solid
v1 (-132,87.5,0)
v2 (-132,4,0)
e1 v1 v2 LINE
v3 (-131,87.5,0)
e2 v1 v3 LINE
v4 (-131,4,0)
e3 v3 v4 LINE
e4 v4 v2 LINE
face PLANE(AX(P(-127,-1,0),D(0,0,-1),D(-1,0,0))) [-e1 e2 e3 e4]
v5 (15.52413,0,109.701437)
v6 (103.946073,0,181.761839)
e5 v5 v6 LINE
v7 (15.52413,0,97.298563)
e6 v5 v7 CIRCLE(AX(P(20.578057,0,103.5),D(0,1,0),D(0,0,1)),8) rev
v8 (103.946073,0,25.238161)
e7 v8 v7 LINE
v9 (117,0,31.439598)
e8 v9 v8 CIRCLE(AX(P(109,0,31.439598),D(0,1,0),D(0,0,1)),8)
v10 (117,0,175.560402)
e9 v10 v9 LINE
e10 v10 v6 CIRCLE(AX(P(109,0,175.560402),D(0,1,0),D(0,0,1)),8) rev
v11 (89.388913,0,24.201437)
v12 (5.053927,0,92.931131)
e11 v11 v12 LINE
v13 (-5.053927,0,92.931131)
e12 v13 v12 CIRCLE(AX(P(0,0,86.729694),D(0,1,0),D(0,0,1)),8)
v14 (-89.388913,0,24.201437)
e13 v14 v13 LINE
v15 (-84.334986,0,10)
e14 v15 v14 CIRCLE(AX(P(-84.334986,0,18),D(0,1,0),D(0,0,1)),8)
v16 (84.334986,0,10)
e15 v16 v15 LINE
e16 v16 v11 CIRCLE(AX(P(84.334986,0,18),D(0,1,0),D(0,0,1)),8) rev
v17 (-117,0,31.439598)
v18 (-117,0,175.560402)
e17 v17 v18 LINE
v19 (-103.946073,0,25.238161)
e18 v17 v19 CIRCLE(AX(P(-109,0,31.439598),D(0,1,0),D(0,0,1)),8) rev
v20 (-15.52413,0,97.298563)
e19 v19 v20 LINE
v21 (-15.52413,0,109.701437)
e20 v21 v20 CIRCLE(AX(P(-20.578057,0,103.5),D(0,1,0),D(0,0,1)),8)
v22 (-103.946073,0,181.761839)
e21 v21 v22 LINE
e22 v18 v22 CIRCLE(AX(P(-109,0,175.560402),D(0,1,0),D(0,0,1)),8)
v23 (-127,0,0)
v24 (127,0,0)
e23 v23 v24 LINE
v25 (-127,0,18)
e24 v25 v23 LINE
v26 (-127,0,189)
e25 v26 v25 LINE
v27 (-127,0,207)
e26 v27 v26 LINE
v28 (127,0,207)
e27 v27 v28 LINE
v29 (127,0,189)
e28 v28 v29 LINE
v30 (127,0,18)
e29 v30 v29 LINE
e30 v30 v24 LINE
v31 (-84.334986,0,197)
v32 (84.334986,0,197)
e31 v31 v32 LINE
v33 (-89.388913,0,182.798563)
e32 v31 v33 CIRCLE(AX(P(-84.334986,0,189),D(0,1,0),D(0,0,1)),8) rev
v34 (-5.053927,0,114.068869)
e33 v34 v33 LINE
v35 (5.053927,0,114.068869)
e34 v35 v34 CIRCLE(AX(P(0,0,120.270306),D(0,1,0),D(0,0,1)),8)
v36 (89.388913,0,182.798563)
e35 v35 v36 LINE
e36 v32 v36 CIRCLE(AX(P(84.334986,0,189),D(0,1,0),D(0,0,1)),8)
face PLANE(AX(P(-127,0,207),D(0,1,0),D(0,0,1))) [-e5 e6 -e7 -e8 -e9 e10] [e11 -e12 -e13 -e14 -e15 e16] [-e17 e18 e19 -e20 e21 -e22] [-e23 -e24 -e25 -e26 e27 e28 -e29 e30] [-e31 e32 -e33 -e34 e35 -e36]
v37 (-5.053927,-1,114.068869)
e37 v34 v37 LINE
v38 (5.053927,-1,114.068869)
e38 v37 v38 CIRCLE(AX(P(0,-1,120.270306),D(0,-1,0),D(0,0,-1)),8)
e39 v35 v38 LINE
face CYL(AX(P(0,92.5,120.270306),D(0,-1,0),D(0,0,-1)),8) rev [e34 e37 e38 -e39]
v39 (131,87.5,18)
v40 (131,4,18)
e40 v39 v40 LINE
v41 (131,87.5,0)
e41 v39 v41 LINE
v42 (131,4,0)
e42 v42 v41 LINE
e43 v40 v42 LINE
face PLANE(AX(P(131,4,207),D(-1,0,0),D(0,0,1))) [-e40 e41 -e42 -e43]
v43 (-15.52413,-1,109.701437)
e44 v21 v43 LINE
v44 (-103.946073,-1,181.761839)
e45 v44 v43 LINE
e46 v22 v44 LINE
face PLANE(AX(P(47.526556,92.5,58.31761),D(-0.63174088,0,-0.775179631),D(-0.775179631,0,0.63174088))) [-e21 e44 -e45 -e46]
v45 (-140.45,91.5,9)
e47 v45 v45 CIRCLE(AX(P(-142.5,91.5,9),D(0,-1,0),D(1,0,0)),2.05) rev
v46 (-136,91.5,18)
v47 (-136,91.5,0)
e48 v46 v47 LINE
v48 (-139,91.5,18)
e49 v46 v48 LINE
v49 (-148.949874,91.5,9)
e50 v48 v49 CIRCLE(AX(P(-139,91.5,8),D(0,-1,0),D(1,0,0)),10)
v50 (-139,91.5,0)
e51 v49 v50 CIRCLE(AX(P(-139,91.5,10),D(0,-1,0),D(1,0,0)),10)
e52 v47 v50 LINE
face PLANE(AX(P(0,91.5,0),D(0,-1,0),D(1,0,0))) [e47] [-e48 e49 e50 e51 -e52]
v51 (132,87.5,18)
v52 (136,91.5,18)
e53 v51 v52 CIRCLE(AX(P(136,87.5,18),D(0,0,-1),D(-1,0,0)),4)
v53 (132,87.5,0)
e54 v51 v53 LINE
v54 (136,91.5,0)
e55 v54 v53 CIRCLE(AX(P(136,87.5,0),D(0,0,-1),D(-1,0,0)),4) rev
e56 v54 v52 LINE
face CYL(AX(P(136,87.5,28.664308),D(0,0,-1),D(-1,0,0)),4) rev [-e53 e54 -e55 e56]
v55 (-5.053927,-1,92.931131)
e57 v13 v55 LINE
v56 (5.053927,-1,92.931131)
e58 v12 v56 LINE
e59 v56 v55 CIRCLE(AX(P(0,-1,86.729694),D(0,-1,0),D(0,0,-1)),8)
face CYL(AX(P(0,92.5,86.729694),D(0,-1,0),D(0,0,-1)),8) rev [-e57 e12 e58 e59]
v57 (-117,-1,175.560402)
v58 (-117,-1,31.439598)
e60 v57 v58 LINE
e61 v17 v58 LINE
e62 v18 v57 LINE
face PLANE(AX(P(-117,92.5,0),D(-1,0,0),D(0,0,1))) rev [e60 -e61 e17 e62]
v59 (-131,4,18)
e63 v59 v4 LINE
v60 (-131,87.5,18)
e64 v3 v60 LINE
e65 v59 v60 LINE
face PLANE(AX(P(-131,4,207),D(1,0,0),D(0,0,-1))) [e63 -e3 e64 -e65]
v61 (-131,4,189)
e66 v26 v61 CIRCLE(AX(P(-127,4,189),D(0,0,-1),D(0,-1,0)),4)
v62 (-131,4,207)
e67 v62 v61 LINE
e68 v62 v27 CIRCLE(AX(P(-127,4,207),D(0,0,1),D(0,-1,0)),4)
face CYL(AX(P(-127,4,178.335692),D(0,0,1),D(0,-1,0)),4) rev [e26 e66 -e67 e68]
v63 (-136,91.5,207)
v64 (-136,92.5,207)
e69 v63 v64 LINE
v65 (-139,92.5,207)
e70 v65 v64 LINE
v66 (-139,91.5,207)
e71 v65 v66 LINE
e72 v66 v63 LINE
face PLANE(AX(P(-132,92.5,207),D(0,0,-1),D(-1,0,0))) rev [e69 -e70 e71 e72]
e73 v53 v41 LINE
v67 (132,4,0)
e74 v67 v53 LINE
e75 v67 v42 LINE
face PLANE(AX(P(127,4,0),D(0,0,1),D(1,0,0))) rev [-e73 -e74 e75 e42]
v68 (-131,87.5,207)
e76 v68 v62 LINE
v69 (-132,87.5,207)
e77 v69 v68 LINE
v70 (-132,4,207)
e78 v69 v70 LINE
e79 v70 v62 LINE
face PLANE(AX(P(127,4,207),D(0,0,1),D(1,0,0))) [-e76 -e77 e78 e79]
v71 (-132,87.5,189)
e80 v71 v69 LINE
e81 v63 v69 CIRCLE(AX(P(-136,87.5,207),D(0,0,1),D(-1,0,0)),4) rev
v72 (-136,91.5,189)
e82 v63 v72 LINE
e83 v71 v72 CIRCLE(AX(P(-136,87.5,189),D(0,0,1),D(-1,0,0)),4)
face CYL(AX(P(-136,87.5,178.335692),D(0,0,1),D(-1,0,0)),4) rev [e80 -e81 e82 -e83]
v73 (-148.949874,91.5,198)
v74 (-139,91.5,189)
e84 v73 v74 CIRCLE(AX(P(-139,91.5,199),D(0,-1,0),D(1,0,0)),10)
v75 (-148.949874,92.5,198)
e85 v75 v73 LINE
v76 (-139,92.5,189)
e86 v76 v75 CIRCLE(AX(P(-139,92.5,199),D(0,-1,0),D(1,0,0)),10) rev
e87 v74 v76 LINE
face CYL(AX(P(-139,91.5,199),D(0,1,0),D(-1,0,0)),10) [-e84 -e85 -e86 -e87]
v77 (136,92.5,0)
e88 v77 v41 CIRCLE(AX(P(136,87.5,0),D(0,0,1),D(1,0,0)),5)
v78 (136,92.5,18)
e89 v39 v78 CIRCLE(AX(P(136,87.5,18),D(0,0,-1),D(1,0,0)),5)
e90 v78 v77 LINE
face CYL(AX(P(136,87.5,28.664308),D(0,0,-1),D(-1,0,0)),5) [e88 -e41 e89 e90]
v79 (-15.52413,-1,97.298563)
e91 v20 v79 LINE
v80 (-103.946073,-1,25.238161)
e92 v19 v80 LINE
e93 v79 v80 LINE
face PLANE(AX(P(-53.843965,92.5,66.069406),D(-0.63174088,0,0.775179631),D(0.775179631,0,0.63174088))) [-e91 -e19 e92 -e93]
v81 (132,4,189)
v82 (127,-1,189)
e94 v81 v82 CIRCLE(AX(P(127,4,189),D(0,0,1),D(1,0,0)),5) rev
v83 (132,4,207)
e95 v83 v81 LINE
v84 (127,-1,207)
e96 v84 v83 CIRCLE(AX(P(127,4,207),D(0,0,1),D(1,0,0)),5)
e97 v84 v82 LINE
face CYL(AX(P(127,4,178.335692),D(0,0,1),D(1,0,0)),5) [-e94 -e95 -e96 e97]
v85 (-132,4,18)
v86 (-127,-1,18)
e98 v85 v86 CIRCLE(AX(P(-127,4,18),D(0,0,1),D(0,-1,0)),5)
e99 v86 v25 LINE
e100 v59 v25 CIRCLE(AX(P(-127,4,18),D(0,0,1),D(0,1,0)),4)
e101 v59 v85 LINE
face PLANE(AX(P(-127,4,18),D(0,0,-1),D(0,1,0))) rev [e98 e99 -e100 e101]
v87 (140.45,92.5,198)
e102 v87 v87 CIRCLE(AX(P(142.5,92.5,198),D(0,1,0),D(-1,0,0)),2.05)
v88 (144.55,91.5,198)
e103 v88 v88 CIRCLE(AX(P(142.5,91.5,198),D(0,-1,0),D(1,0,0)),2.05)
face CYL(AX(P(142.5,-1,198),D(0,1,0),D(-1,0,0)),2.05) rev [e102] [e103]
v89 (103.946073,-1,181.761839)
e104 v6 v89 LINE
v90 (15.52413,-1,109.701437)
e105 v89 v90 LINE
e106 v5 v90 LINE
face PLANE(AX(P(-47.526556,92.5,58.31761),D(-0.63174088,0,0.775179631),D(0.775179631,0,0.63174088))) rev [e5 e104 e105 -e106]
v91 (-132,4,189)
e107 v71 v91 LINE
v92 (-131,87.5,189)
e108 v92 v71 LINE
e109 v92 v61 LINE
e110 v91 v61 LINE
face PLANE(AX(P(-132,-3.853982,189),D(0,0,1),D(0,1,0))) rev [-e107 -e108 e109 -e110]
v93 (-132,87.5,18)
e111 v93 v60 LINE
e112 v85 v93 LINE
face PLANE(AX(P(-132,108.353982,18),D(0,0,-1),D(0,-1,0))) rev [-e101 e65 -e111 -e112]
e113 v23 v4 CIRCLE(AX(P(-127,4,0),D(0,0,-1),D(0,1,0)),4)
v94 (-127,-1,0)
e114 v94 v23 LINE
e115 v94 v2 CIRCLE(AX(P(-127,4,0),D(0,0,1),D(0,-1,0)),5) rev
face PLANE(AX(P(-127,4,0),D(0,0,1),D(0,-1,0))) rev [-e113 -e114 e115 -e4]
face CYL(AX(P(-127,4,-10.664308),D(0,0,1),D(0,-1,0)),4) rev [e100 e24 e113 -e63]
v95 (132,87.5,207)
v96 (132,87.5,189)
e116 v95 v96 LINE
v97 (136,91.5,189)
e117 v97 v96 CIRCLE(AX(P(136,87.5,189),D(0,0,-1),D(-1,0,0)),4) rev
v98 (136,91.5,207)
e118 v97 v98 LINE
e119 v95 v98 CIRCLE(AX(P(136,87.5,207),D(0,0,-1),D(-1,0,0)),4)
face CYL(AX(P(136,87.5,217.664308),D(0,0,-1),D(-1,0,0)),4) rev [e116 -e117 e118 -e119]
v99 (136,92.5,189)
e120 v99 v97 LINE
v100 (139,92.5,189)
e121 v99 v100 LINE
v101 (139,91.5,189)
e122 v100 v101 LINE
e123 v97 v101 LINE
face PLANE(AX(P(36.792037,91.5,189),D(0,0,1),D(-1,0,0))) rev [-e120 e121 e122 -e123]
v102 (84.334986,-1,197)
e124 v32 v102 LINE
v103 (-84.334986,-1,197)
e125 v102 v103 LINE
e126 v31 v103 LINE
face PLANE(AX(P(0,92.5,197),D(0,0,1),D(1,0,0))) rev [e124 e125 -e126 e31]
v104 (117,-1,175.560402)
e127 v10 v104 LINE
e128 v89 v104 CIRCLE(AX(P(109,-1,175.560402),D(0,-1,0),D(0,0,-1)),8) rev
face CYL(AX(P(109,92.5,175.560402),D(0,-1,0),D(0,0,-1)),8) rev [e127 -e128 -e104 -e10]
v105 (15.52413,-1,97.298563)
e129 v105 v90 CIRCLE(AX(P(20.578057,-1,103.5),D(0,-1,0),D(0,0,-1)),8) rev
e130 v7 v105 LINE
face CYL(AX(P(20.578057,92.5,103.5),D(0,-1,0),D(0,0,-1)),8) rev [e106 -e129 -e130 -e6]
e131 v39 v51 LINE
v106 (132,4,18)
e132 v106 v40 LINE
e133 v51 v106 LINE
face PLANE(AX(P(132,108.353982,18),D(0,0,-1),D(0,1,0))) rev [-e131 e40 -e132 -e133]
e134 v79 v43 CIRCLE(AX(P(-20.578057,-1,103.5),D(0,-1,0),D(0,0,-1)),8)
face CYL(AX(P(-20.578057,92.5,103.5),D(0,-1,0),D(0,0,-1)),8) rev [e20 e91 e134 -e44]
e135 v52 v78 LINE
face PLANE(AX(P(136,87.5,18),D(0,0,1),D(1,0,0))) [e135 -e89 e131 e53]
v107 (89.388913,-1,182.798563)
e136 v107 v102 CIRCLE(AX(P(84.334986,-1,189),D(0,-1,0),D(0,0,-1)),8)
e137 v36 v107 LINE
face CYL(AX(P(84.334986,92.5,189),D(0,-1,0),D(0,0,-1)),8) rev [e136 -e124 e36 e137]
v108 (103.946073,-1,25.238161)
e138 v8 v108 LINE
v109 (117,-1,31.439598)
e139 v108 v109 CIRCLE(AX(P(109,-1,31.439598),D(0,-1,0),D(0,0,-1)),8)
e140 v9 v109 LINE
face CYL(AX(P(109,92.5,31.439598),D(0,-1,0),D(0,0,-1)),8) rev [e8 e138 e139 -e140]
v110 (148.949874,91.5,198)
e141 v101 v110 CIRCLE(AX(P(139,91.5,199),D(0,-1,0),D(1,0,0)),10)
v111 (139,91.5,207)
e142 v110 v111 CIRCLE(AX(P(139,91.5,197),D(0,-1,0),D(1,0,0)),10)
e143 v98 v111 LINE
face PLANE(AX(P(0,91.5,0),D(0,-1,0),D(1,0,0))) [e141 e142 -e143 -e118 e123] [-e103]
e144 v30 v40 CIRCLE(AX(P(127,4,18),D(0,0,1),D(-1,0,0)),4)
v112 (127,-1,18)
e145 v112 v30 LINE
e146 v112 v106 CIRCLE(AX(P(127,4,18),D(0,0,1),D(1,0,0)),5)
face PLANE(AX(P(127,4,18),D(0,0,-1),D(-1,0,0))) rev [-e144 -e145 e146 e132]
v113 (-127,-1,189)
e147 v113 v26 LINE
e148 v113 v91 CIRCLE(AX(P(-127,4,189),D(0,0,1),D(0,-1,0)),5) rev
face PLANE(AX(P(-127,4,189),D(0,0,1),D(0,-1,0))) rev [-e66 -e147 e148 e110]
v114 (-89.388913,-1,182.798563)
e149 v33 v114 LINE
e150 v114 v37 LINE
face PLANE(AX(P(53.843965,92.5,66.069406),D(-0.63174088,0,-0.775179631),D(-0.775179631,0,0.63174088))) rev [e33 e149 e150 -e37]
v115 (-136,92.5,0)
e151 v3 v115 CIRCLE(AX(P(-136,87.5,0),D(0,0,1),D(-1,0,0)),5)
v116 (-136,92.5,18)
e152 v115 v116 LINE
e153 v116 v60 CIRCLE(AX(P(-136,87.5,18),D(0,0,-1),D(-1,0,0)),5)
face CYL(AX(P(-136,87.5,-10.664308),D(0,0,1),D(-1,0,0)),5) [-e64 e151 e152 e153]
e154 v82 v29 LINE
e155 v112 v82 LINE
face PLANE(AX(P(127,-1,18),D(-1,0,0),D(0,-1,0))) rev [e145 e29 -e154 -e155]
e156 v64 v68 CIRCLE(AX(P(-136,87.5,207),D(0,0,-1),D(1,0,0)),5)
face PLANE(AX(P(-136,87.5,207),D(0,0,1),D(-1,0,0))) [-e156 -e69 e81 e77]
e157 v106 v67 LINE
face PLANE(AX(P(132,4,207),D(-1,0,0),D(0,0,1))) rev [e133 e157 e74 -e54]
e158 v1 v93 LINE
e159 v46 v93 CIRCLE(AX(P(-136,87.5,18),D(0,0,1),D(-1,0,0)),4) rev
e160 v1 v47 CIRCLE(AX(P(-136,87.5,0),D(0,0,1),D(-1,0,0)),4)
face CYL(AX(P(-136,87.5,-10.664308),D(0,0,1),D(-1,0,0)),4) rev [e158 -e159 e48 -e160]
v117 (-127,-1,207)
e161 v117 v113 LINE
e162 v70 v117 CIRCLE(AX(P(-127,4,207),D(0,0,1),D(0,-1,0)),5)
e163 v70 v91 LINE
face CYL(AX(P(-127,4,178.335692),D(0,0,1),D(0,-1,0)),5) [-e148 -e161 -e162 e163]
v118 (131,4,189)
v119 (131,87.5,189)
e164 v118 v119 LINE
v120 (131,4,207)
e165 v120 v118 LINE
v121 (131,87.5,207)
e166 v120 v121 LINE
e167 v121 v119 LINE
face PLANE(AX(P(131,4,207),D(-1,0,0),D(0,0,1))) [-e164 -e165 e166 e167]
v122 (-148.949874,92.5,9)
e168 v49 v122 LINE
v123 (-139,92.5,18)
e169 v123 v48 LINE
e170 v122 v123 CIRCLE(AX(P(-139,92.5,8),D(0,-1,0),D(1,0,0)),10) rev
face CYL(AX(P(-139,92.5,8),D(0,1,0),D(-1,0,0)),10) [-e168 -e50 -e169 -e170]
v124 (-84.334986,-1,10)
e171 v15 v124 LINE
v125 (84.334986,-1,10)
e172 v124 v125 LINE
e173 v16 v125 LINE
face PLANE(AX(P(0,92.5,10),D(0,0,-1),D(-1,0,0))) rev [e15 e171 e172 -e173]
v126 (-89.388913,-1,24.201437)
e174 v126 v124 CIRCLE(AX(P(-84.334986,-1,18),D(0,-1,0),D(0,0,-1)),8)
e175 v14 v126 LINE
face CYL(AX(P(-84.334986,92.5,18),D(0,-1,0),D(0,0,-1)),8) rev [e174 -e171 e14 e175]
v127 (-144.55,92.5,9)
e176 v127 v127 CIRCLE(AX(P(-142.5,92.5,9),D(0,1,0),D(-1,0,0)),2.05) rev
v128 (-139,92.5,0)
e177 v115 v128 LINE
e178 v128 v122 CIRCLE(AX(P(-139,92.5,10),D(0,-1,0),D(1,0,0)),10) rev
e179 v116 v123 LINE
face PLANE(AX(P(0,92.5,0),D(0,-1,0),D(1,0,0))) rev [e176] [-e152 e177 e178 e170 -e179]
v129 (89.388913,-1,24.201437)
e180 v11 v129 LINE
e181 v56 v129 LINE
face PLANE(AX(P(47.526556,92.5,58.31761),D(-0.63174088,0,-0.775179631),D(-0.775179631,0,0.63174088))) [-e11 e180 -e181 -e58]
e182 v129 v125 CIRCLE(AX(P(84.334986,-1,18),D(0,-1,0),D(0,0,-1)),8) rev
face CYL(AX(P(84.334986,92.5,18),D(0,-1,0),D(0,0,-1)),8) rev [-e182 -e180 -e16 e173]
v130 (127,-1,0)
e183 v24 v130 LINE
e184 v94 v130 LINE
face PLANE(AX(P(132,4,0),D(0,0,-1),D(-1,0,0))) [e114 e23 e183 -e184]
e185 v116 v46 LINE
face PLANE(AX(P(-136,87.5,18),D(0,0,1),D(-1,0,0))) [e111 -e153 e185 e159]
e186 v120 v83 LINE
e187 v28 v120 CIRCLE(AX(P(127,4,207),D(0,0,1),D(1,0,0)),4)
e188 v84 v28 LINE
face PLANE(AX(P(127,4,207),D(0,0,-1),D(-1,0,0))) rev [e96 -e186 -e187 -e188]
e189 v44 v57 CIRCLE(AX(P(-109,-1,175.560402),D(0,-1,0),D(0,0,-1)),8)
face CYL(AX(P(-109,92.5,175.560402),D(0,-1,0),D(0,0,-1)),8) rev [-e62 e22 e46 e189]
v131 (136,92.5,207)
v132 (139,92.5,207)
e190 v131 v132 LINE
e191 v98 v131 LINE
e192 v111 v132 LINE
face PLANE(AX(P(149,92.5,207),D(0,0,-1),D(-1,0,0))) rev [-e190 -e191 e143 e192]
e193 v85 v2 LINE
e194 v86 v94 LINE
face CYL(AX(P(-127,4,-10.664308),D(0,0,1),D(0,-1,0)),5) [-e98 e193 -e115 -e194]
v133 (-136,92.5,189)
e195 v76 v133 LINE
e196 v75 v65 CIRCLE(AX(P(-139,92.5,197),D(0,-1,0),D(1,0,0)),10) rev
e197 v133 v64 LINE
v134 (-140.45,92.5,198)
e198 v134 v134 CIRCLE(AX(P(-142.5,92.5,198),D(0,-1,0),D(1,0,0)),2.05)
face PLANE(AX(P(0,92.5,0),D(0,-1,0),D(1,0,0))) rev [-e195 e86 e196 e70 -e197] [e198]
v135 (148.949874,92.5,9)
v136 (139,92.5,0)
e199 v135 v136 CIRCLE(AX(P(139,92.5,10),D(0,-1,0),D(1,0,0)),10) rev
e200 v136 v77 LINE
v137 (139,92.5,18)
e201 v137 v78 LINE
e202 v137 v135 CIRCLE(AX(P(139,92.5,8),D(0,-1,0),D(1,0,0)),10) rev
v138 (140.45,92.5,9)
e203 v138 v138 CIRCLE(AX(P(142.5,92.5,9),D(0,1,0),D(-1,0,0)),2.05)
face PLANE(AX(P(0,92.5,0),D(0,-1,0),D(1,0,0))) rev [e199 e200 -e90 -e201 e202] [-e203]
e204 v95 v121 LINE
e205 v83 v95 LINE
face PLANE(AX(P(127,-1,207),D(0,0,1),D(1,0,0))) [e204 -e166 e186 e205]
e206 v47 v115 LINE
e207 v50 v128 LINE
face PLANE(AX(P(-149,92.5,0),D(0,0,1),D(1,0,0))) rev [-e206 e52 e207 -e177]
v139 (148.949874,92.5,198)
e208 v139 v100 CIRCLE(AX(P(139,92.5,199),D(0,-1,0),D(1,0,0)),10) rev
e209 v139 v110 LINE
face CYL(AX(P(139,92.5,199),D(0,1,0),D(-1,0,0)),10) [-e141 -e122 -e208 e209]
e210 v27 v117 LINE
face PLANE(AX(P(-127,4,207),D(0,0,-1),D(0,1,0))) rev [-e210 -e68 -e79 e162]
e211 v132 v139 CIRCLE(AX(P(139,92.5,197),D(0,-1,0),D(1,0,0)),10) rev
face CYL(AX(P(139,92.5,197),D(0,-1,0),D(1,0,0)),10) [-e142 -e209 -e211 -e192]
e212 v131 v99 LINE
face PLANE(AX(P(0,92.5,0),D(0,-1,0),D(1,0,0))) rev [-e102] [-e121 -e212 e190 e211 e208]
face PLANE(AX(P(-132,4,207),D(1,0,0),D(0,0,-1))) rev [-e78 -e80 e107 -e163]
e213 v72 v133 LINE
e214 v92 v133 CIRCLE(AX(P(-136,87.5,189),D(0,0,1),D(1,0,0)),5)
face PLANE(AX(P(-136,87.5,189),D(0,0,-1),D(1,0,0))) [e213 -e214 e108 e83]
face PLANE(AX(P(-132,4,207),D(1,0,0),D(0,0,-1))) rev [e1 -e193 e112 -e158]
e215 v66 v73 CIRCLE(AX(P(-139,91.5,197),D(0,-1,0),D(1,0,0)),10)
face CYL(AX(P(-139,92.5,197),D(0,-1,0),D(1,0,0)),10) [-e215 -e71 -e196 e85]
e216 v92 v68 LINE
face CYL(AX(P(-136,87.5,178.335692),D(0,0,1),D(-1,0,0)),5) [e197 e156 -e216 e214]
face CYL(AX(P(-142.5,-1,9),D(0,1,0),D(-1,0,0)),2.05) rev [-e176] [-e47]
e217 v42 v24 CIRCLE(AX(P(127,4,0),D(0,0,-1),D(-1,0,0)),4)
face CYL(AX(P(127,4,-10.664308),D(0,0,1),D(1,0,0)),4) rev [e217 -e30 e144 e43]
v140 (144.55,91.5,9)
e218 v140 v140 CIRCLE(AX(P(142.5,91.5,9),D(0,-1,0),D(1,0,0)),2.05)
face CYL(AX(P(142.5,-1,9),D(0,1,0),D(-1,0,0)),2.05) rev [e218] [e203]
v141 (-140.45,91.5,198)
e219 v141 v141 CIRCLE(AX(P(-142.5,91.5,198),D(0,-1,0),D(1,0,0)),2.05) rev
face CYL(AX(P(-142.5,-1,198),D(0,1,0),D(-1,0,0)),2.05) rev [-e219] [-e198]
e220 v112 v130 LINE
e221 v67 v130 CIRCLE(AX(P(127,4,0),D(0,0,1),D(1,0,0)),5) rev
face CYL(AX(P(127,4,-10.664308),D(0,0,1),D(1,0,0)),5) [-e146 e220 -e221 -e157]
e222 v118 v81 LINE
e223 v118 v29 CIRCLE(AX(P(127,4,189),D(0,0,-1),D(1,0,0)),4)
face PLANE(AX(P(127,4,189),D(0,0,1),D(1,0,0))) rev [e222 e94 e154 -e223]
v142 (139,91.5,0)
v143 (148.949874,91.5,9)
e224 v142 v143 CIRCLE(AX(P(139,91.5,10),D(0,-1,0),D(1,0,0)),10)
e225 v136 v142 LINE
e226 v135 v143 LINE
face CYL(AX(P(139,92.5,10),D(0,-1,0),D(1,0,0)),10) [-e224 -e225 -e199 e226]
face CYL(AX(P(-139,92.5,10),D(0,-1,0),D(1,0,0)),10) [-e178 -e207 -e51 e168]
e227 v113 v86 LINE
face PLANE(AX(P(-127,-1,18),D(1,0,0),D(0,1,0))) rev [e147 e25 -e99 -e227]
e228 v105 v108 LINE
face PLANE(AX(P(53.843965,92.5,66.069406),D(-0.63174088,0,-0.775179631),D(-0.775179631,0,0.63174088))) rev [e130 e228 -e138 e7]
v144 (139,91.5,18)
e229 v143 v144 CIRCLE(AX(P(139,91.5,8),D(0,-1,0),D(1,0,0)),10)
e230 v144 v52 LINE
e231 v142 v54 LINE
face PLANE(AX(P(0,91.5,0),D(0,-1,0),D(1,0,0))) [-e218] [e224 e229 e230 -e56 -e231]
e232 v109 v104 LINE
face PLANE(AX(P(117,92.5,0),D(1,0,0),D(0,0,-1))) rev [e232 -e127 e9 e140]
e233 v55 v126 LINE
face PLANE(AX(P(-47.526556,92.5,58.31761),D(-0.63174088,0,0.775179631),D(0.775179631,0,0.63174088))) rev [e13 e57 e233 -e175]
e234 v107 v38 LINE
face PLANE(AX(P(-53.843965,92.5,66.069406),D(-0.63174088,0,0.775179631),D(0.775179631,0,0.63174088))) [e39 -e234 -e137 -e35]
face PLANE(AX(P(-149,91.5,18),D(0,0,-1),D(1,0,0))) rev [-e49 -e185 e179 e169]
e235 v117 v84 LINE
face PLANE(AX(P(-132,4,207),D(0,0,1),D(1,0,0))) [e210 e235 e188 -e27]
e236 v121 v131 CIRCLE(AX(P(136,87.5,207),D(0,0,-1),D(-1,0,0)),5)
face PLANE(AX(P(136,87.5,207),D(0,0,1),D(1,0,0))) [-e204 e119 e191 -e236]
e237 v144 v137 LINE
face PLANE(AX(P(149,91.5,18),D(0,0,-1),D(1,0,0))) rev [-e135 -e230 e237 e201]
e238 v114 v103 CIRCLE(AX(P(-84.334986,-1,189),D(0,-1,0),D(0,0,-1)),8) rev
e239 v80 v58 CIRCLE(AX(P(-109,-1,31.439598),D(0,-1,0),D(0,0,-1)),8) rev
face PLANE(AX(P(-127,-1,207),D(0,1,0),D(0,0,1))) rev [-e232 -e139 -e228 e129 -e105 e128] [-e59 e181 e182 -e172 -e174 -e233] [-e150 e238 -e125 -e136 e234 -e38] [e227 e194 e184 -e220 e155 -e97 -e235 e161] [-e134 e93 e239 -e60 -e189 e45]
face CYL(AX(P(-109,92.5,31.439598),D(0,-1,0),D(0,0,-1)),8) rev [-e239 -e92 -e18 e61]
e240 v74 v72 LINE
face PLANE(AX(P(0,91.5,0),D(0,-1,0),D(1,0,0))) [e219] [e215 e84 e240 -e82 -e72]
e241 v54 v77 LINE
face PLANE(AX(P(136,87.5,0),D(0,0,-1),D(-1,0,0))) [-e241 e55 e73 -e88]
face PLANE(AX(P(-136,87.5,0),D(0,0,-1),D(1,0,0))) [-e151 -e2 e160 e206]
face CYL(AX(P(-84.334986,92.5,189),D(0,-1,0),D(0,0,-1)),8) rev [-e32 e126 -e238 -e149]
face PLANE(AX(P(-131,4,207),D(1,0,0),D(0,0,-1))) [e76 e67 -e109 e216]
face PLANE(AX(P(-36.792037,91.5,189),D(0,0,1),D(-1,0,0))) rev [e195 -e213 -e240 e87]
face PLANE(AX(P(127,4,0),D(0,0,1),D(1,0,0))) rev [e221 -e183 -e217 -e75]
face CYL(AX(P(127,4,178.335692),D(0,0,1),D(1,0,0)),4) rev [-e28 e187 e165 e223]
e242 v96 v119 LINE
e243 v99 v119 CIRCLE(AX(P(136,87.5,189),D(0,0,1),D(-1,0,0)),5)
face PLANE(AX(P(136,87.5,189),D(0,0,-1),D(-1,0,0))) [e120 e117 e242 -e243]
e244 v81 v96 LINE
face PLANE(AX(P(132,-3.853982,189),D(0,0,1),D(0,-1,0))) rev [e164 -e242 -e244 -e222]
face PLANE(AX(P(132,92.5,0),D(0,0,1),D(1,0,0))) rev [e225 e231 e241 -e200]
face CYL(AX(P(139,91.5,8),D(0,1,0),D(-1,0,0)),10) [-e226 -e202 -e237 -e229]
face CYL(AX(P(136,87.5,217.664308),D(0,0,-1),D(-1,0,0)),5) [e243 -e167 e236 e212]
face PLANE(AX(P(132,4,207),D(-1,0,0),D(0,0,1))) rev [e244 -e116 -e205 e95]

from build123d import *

# Parameters (mm, degrees)
BASE_FLANGE1_DEPTH           = 207
EDGE_FLANGE1_STRIP_W         = 12
EDGE_FLANGE1_STRIP_H         = 1
EDGE_FLANGE1_STRIP_CUT_DEPTH = 207
EDGE_FLANGE1_DEPTH           = 207
EDGE_FLANGE2_STRIP_W         = 12
EDGE_FLANGE2_STRIP_H         = 1
EDGE_FLANGE2_STRIP_CUT_DEPTH = 207
EDGE_FLANGE2_DEPTH           = 207
UNFOLD1_DEPTH                = 207
UNFOLD1_2_DEPTH              = 207
SKETCH15_W                   = 171
SKETCH15_H                   = 112.207963268
CUT_EXTRUDE2_DEPTH           = 425.023399195
FOLD2_DEPTH                  = 207
FOLD2_2_OUTLINE_W            = 254
FOLD2_2_OUTLINE_H            = 1
FOLD2_2_DEPTH                = 207
FOLD2_3_DEPTH                = 18
FOLD2_START                  = 189
FOLD2_4_DEPTH                = 18
CUT_EXTRUDE3_DEPTH           = 272.647289698
SKETCH19_R                   = 2.05
CUT_EXTRUDE4_DEPTH           = 272.647289698
FILLET2_R                    = 10


# Read off the part's stored shape, not the designer's step: Unfold1, Fold2
# Sheet-metal steps are written as plain solids
with BuildPart() as part:
    # Sketch1 → Base-Flange1 (new body)
    with BuildSketch(Plane.XY):
        with BuildLine():
            Line((-131, 92.5), (-131, 4))
            ThreePointArc((-131, 4), (-129.828427125, 1.171572875), (-127, 0))
            Line((-127, 0), (127, 0))
            ThreePointArc((127, 0), (129.828427125, 1.171572875), (131, 4))
            Line((131, 4), (131, 92.5))
            Line((131, 92.5), (132, 92.5))
            Line((132, 92.5), (132, 4))
            ThreePointArc((132, 4), (130.535533906, 0.464466094), (127, -1))
            Line((127, -1), (-127, -1))
            ThreePointArc((-127, -1), (-130.535533906, 0.464466094), (-132, 4))
            Line((-132, 4), (-132, 92.5))
            Line((-132, 92.5), (-131, 92.5))
        make_face()
    extrude(amount=BASE_FLANGE1_DEPTH)

    # Edge-Flange1 strip (across the edge) → Edge-Flange1 strip cut (cut)
    with BuildSketch(Plane(origin=(132, 92.5, 0), x_dir=(0, -1, 0), z_dir=(0, 0, 1))):
        with Locations((-1, -0.5)):
            Rectangle(EDGE_FLANGE1_STRIP_W, EDGE_FLANGE1_STRIP_H)
    extrude(amount=EDGE_FLANGE1_STRIP_CUT_DEPTH, mode=Mode.SUBTRACT)

    # Edge-Flange1 section (across the edge) → Edge-Flange1 (add)
    with BuildSketch(Plane(origin=(132, 92.5, 0), x_dir=(0, -1, 0), z_dir=(0, 0, 1))):
        with BuildLine():
            Line((0, 4), (0, 17))
            Line((0, 17), (1, 17))
            Line((1, 17), (1, 4))
            ThreePointArc((1, 4), (2.171572875, 1.171572875), (5, 0))
            Line((5, 0), (5, -1))
            ThreePointArc((5, -1), (1.464466094, 0.464466094), (0, 4))
        make_face()
    extrude(amount=EDGE_FLANGE1_DEPTH)

    # Edge-Flange2 strip (across the edge) → Edge-Flange2 strip cut (cut)
    with BuildSketch(Plane(origin=(-132, 92.5, 207), x_dir=(0, -1, 0), z_dir=(0, 0, -1))):
        with Locations((-1, -0.5)):
            Rectangle(EDGE_FLANGE2_STRIP_W, EDGE_FLANGE2_STRIP_H)
    extrude(amount=EDGE_FLANGE2_STRIP_CUT_DEPTH, mode=Mode.SUBTRACT)

    # Edge-Flange2 section (across the edge) → Edge-Flange2 (add)
    with BuildSketch(Plane(origin=(-132, 92.5, 207), x_dir=(0, -1, 0), z_dir=(0, 0, -1))):
        with BuildLine():
            Line((0, 4), (0, 17))
            Line((0, 17), (1, 17))
            Line((1, 17), (1, 4))
            ThreePointArc((1, 4), (2.171572875, 1.171572875), (5, 0))
            Line((5, 0), (5, -1))
            ThreePointArc((5, -1), (1.464466094, 0.464466094), (0, 4))
        make_face()
    extrude(amount=EDGE_FLANGE2_DEPTH)

    # Unfold1 outline → Unfold1 (cut)
    with BuildSketch(Plane.XY):
        with BuildLine():
            ThreePointArc((127, -1), (129.236067977, -0.472135955), (131, 1))
            Line((131, 1), (131, 4))
            ThreePointArc((131, 4), (129.828427125, 1.171572875), (127, 0))
            Line((127, 0), (-127, 0))
            ThreePointArc((-127, 0), (-129.828427125, 1.171572875), (-131, 4))
            Line((-131, 4), (-131, 87.5))
            ThreePointArc((-131, 87.5), (-132.464466094, 91.035533906), (-136, 92.5))
            Line((-136, 92.5), (-149, 92.5))
            Line((-149, 92.5), (-149, 91.5))
            Line((-149, 91.5), (-136, 91.5))
            ThreePointArc((-136, 91.5), (-133.171572875, 90.328427125), (-132, 87.5))
            Line((-132, 87.5), (-132, 4))
            ThreePointArc((-132, 4), (-130.535533906, 0.464466094), (-127, -1))
            Line((-127, -1), (127, -1))
        make_face()
        with BuildLine():
            ThreePointArc((136, 92.5), (133.763932023, 91.972135955), (132, 90.5))
            Line((132, 90.5), (132, 87.5))
            ThreePointArc((132, 87.5), (133.171572875, 90.328427125), (136, 91.5))
            Line((136, 91.5), (149, 91.5))
            Line((149, 91.5), (149, 92.5))
            Line((149, 92.5), (136, 92.5))
        make_face()
    extrude(amount=UNFOLD1_DEPTH, mode=Mode.SUBTRACT)

    # Unfold1 2 outline → Unfold1 2 (add)
    with BuildSketch(Plane.XY):
        with BuildLine():
            Line((131, 1), (131, -370.061944902))
            Line((131, -370.061944902), (132, -370.061944902))
            Line((132, -370.061944902), (132, 4))
            ThreePointArc((132, 4), (131.74341649, 2.41886117), (131, 1))
        make_face()
        with BuildLine():
            Line((131, 108.353981634), (131, 87.5))
            ThreePointArc((131, 87.5), (131.25658351, 89.08113883), (132, 90.5))
            Line((132, 90.5), (132, 108.353981634))
            Line((132, 108.353981634), (131, 108.353981634))
        make_face()
    extrude(amount=UNFOLD1_2_DEPTH)

    # Sketch15 → Cut-Extrude2 (cut, through all)
    with BuildSketch(Plane.ZY.offset(-131)):
        with Locations((103.5, 52.25)):
            Rectangle(SKETCH15_W, SKETCH15_H)
        with Locations((103.5, -313.957963268)):
            Rectangle(SKETCH15_W, SKETCH15_H)
    extrude(amount=-CUT_EXTRUDE2_DEPTH, mode=Mode.SUBTRACT)

    # Fold2 outline → Fold2 (cut)
    with BuildSketch(Plane.XY):
        with BuildLine():
            ThreePointArc((132, 4), (131.74341649, 2.41886117), (131, 1))
            Line((131, 1), (131, -370.061944902))
            Line((131, -370.061944902), (132, -370.061944902))
            Line((132, -370.061944902), (132, 4))
        make_face()
        with BuildLine():
            ThreePointArc((131, 87.5), (131.25658351, 89.08113883), (132, 90.5))
            Line((132, 90.5), (132, 108.353981634))
            Line((132, 108.353981634), (131, 108.353981634))
            Line((131, 108.353981634), (131, 87.5))
        make_face()
    extrude(amount=FOLD2_DEPTH, mode=Mode.SUBTRACT)



with BuildPart() as body_2:
    # Fold2 2 outline → Fold2 2 (new body)
    with BuildSketch(Plane.XY):
        with Locations((0, -0.5)):
            Rectangle(FOLD2_2_OUTLINE_W, FOLD2_2_OUTLINE_H)
    extrude(amount=FOLD2_2_DEPTH)


with BuildPart() as part_1:
    add(part.part)

    add(body_2.part)  # Fold2 3 merges body 2
    # Fold2 3 outline → Fold2 3 (add)
    with BuildSketch(Plane.XY):
        with BuildLine():
            ThreePointArc((131, 4), (129.828427125, 1.171572875), (127, 0))
            Line((127, 0), (127, -1))
            ThreePointArc((127, -1), (129.236067977, -0.472135955), (131, 1))
            Line((131, 1), (131, 4))
        make_face()
        with BuildLine():
            Line((-127, -1), (-127, 0))
            ThreePointArc((-127, 0), (-129.828427125, 1.171572875), (-131, 4))
            Line((-131, 4), (-131, 87.5))
            ThreePointArc((-131, 87.5), (-132.464466094, 91.035533906), (-136, 92.5))
            Line((-136, 92.5), (-149, 92.5))
            Line((-149, 92.5), (-149, 91.5))
            Line((-149, 91.5), (-136, 91.5))
            ThreePointArc((-136, 91.5), (-133.171572875, 90.328427125), (-132, 87.5))
            Line((-132, 87.5), (-132, 4))
            ThreePointArc((-132, 4), (-130.535533906, 0.464466094), (-127, -1))
        make_face()
        with BuildLine():
            ThreePointArc((132, 87.5), (133.171572875, 90.328427125), (136, 91.5))
            Line((136, 91.5), (149, 91.5))
            Line((149, 91.5), (149, 92.5))
            Line((149, 92.5), (136, 92.5))
            ThreePointArc((136, 92.5), (133.763932023, 91.972135955), (132, 90.5))
            Line((132, 90.5), (132, 87.5))
        make_face()
    extrude(amount=FOLD2_3_DEPTH)

    # Fold2 4 outline → Fold2 4 (add)
    with BuildSketch(Plane.XY.offset(FOLD2_START)):
        with BuildLine():
            ThreePointArc((131, 4), (129.828427125, 1.171572875), (127, 0))
            Line((127, 0), (127, -1))
            ThreePointArc((127, -1), (129.236067977, -0.472135955), (131, 1))
            Line((131, 1), (131, 4))
        make_face()
        with BuildLine():
            Line((-127, -1), (-127, 0))
            ThreePointArc((-127, 0), (-129.828427125, 1.171572875), (-131, 4))
            Line((-131, 4), (-131, 87.5))
            ThreePointArc((-131, 87.5), (-132.464466094, 91.035533906), (-136, 92.5))
            Line((-136, 92.5), (-149, 92.5))
            Line((-149, 92.5), (-149, 91.5))
            Line((-149, 91.5), (-136, 91.5))
            ThreePointArc((-136, 91.5), (-133.171572875, 90.328427125), (-132, 87.5))
            Line((-132, 87.5), (-132, 4))
            ThreePointArc((-132, 4), (-130.535533906, 0.464466094), (-127, -1))
        make_face()
        with BuildLine():
            ThreePointArc((132, 87.5), (133.171572875, 90.328427125), (136, 91.5))
            Line((136, 91.5), (149, 91.5))
            Line((149, 91.5), (149, 92.5))
            Line((149, 92.5), (136, 92.5))
            ThreePointArc((136, 92.5), (133.763932023, 91.972135955), (132, 90.5))
            Line((132, 90.5), (132, 87.5))
        make_face()
    extrude(amount=FOLD2_4_DEPTH)

    # Sketch18 → Cut-Extrude3 (cut, through all)
    with BuildSketch(Plane.XZ.offset(1)):
        with BuildLine():
            Line((-103.946072958, 181.761839212), (-15.524130205, 109.701437047))
            ThreePointArc((-15.524130205, 109.701437047), (-12.578057247, 103.5), (-15.524130205, 97.298562953))
            Line((-15.524130205, 97.298562953), (-103.946072958, 25.238160788))
            ThreePointArc((-103.946072958, 25.238160788), (-112.432825634, 24.213554093), (-117, 31.439597835))
            Line((-117, 31.439597835), (-117, 175.560402165))
            ThreePointArc((-117, 175.560402165), (-112.432825634, 182.786445907), (-103.946072958, 181.761839212))
        make_face()
        with BuildLine():
            ThreePointArc((-89.388913274, 182.798562953), (-91.871945047, 191.682210247), (-84.334986231, 197))
            Line((-84.334986231, 197), (84.334986231, 197))
            ThreePointArc((84.334986231, 197), (91.871945047, 191.682210247), (89.388913274, 182.798562953))
            Line((89.388913274, 182.798562953), (5.053927042, 114.068869449))
            ThreePointArc((5.053927042, 114.068869449), (0, 112.270306496), (-5.053927042, 114.068869449))
            Line((-5.053927042, 114.068869449), (-89.388913274, 182.798562953))
        make_face()
        with BuildLine():
            ThreePointArc((103.946072958, 181.761839212), (112.432825634, 182.786445907), (117, 175.560402165))
            Line((117, 175.560402165), (117, 31.439597835))
            ThreePointArc((117, 31.439597835), (112.432825634, 24.213554093), (103.946072958, 25.238160788))
            Line((103.946072958, 25.238160788), (15.524130205, 97.298562953))
            ThreePointArc((15.524130205, 97.298562953), (12.578057247, 103.5), (15.524130205, 109.701437047))
            Line((15.524130205, 109.701437047), (103.946072958, 181.761839212))
        make_face()
        with BuildLine():
            Line((5.053927042, 92.931130551), (89.388913274, 24.201437047))
            ThreePointArc((89.388913274, 24.201437047), (91.871945047, 15.317789753), (84.334986231, 10))
            Line((84.334986231, 10), (-84.334986231, 10))
            ThreePointArc((-84.334986231, 10), (-91.871945047, 15.317789753), (-89.388913274, 24.201437047))
            Line((-89.388913274, 24.201437047), (-5.053927042, 92.931130551))
            ThreePointArc((-5.053927042, 92.931130551), (0, 94.729693504), (5.053927042, 92.931130551))
        make_face()
    extrude(amount=-CUT_EXTRUDE3_DEPTH, mode=Mode.SUBTRACT)

    # Sketch19 → Cut-Extrude4 (cut, through all)
    with BuildSketch(Plane(origin=(0, 92.5, 0), x_dir=(1, 0, 0), z_dir=(0, 1, 0))):
        with Locations(Location((142.5, -198, 0), (0, 0, 180))):
            Circle(SKETCH19_R)
        with Locations(Location((-142.5, -9, 0), (0, 0, 180))):
            Circle(SKETCH19_R)
        with Locations((-142.5, -198)):
            Circle(SKETCH19_R)
        with Locations(Location((142.5, -9, 0), (0, 0, 180))):
            Circle(SKETCH19_R)
    extrude(amount=-CUT_EXTRUDE4_DEPTH, mode=Mode.SUBTRACT)

    # Fillet2
    # the kernel refuses this fillet: 10 mm, written as the material it takes off along each edge
    with BuildSketch(Plane(origin=(149, 66.5, 0), x_dir=(-1, 0, 0), z_dir=(0, 1, 0)), Plane(origin=(149, 66.5, 189), x_dir=(-1, 0, 0), z_dir=(0, 1, 0)), Plane(origin=(-149, 117.5, 189), x_dir=(1, 0, 0), z_dir=(0, -1, 0)), Plane(origin=(-149, 117.5, 0), x_dir=(1, 0, 0), z_dir=(0, -1, 0)), Plane(origin=(-149, 117.5, 18), x_dir=(0, 0, -1), z_dir=(0, -1, 0))) as fillet2_piece_1:
        with BuildLine():
            CenterArc((FILLET2_R, FILLET2_R), FILLET2_R, 180, 90)
            Line((0, FILLET2_R), (0, 0))
            Line((0, 0), (FILLET2_R, 0))
        make_face()
    extrude(amount=51, mode=Mode.SUBTRACT)
    with BuildSketch(Plane(origin=(149, 66.5, 18), x_dir=(-1, 0, 0), z_dir=(0, 1, 0)), Plane(origin=(149, 66.5, 207), x_dir=(-1, 0, 0), z_dir=(0, 1, 0)), Plane(origin=(-149, 117.5, 207), x_dir=(1, 0, 0), z_dir=(0, -1, 0))) as fillet2_piece_2:
        with BuildLine():
            CenterArc((FILLET2_R, -FILLET2_R), FILLET2_R, 90, 90)
            Line((0, -FILLET2_R), (0, 0))
            Line((0, 0), (FILLET2_R, 0))
        make_face()
    extrude(amount=51, mode=Mode.SUBTRACT)


solid = part_1.part
